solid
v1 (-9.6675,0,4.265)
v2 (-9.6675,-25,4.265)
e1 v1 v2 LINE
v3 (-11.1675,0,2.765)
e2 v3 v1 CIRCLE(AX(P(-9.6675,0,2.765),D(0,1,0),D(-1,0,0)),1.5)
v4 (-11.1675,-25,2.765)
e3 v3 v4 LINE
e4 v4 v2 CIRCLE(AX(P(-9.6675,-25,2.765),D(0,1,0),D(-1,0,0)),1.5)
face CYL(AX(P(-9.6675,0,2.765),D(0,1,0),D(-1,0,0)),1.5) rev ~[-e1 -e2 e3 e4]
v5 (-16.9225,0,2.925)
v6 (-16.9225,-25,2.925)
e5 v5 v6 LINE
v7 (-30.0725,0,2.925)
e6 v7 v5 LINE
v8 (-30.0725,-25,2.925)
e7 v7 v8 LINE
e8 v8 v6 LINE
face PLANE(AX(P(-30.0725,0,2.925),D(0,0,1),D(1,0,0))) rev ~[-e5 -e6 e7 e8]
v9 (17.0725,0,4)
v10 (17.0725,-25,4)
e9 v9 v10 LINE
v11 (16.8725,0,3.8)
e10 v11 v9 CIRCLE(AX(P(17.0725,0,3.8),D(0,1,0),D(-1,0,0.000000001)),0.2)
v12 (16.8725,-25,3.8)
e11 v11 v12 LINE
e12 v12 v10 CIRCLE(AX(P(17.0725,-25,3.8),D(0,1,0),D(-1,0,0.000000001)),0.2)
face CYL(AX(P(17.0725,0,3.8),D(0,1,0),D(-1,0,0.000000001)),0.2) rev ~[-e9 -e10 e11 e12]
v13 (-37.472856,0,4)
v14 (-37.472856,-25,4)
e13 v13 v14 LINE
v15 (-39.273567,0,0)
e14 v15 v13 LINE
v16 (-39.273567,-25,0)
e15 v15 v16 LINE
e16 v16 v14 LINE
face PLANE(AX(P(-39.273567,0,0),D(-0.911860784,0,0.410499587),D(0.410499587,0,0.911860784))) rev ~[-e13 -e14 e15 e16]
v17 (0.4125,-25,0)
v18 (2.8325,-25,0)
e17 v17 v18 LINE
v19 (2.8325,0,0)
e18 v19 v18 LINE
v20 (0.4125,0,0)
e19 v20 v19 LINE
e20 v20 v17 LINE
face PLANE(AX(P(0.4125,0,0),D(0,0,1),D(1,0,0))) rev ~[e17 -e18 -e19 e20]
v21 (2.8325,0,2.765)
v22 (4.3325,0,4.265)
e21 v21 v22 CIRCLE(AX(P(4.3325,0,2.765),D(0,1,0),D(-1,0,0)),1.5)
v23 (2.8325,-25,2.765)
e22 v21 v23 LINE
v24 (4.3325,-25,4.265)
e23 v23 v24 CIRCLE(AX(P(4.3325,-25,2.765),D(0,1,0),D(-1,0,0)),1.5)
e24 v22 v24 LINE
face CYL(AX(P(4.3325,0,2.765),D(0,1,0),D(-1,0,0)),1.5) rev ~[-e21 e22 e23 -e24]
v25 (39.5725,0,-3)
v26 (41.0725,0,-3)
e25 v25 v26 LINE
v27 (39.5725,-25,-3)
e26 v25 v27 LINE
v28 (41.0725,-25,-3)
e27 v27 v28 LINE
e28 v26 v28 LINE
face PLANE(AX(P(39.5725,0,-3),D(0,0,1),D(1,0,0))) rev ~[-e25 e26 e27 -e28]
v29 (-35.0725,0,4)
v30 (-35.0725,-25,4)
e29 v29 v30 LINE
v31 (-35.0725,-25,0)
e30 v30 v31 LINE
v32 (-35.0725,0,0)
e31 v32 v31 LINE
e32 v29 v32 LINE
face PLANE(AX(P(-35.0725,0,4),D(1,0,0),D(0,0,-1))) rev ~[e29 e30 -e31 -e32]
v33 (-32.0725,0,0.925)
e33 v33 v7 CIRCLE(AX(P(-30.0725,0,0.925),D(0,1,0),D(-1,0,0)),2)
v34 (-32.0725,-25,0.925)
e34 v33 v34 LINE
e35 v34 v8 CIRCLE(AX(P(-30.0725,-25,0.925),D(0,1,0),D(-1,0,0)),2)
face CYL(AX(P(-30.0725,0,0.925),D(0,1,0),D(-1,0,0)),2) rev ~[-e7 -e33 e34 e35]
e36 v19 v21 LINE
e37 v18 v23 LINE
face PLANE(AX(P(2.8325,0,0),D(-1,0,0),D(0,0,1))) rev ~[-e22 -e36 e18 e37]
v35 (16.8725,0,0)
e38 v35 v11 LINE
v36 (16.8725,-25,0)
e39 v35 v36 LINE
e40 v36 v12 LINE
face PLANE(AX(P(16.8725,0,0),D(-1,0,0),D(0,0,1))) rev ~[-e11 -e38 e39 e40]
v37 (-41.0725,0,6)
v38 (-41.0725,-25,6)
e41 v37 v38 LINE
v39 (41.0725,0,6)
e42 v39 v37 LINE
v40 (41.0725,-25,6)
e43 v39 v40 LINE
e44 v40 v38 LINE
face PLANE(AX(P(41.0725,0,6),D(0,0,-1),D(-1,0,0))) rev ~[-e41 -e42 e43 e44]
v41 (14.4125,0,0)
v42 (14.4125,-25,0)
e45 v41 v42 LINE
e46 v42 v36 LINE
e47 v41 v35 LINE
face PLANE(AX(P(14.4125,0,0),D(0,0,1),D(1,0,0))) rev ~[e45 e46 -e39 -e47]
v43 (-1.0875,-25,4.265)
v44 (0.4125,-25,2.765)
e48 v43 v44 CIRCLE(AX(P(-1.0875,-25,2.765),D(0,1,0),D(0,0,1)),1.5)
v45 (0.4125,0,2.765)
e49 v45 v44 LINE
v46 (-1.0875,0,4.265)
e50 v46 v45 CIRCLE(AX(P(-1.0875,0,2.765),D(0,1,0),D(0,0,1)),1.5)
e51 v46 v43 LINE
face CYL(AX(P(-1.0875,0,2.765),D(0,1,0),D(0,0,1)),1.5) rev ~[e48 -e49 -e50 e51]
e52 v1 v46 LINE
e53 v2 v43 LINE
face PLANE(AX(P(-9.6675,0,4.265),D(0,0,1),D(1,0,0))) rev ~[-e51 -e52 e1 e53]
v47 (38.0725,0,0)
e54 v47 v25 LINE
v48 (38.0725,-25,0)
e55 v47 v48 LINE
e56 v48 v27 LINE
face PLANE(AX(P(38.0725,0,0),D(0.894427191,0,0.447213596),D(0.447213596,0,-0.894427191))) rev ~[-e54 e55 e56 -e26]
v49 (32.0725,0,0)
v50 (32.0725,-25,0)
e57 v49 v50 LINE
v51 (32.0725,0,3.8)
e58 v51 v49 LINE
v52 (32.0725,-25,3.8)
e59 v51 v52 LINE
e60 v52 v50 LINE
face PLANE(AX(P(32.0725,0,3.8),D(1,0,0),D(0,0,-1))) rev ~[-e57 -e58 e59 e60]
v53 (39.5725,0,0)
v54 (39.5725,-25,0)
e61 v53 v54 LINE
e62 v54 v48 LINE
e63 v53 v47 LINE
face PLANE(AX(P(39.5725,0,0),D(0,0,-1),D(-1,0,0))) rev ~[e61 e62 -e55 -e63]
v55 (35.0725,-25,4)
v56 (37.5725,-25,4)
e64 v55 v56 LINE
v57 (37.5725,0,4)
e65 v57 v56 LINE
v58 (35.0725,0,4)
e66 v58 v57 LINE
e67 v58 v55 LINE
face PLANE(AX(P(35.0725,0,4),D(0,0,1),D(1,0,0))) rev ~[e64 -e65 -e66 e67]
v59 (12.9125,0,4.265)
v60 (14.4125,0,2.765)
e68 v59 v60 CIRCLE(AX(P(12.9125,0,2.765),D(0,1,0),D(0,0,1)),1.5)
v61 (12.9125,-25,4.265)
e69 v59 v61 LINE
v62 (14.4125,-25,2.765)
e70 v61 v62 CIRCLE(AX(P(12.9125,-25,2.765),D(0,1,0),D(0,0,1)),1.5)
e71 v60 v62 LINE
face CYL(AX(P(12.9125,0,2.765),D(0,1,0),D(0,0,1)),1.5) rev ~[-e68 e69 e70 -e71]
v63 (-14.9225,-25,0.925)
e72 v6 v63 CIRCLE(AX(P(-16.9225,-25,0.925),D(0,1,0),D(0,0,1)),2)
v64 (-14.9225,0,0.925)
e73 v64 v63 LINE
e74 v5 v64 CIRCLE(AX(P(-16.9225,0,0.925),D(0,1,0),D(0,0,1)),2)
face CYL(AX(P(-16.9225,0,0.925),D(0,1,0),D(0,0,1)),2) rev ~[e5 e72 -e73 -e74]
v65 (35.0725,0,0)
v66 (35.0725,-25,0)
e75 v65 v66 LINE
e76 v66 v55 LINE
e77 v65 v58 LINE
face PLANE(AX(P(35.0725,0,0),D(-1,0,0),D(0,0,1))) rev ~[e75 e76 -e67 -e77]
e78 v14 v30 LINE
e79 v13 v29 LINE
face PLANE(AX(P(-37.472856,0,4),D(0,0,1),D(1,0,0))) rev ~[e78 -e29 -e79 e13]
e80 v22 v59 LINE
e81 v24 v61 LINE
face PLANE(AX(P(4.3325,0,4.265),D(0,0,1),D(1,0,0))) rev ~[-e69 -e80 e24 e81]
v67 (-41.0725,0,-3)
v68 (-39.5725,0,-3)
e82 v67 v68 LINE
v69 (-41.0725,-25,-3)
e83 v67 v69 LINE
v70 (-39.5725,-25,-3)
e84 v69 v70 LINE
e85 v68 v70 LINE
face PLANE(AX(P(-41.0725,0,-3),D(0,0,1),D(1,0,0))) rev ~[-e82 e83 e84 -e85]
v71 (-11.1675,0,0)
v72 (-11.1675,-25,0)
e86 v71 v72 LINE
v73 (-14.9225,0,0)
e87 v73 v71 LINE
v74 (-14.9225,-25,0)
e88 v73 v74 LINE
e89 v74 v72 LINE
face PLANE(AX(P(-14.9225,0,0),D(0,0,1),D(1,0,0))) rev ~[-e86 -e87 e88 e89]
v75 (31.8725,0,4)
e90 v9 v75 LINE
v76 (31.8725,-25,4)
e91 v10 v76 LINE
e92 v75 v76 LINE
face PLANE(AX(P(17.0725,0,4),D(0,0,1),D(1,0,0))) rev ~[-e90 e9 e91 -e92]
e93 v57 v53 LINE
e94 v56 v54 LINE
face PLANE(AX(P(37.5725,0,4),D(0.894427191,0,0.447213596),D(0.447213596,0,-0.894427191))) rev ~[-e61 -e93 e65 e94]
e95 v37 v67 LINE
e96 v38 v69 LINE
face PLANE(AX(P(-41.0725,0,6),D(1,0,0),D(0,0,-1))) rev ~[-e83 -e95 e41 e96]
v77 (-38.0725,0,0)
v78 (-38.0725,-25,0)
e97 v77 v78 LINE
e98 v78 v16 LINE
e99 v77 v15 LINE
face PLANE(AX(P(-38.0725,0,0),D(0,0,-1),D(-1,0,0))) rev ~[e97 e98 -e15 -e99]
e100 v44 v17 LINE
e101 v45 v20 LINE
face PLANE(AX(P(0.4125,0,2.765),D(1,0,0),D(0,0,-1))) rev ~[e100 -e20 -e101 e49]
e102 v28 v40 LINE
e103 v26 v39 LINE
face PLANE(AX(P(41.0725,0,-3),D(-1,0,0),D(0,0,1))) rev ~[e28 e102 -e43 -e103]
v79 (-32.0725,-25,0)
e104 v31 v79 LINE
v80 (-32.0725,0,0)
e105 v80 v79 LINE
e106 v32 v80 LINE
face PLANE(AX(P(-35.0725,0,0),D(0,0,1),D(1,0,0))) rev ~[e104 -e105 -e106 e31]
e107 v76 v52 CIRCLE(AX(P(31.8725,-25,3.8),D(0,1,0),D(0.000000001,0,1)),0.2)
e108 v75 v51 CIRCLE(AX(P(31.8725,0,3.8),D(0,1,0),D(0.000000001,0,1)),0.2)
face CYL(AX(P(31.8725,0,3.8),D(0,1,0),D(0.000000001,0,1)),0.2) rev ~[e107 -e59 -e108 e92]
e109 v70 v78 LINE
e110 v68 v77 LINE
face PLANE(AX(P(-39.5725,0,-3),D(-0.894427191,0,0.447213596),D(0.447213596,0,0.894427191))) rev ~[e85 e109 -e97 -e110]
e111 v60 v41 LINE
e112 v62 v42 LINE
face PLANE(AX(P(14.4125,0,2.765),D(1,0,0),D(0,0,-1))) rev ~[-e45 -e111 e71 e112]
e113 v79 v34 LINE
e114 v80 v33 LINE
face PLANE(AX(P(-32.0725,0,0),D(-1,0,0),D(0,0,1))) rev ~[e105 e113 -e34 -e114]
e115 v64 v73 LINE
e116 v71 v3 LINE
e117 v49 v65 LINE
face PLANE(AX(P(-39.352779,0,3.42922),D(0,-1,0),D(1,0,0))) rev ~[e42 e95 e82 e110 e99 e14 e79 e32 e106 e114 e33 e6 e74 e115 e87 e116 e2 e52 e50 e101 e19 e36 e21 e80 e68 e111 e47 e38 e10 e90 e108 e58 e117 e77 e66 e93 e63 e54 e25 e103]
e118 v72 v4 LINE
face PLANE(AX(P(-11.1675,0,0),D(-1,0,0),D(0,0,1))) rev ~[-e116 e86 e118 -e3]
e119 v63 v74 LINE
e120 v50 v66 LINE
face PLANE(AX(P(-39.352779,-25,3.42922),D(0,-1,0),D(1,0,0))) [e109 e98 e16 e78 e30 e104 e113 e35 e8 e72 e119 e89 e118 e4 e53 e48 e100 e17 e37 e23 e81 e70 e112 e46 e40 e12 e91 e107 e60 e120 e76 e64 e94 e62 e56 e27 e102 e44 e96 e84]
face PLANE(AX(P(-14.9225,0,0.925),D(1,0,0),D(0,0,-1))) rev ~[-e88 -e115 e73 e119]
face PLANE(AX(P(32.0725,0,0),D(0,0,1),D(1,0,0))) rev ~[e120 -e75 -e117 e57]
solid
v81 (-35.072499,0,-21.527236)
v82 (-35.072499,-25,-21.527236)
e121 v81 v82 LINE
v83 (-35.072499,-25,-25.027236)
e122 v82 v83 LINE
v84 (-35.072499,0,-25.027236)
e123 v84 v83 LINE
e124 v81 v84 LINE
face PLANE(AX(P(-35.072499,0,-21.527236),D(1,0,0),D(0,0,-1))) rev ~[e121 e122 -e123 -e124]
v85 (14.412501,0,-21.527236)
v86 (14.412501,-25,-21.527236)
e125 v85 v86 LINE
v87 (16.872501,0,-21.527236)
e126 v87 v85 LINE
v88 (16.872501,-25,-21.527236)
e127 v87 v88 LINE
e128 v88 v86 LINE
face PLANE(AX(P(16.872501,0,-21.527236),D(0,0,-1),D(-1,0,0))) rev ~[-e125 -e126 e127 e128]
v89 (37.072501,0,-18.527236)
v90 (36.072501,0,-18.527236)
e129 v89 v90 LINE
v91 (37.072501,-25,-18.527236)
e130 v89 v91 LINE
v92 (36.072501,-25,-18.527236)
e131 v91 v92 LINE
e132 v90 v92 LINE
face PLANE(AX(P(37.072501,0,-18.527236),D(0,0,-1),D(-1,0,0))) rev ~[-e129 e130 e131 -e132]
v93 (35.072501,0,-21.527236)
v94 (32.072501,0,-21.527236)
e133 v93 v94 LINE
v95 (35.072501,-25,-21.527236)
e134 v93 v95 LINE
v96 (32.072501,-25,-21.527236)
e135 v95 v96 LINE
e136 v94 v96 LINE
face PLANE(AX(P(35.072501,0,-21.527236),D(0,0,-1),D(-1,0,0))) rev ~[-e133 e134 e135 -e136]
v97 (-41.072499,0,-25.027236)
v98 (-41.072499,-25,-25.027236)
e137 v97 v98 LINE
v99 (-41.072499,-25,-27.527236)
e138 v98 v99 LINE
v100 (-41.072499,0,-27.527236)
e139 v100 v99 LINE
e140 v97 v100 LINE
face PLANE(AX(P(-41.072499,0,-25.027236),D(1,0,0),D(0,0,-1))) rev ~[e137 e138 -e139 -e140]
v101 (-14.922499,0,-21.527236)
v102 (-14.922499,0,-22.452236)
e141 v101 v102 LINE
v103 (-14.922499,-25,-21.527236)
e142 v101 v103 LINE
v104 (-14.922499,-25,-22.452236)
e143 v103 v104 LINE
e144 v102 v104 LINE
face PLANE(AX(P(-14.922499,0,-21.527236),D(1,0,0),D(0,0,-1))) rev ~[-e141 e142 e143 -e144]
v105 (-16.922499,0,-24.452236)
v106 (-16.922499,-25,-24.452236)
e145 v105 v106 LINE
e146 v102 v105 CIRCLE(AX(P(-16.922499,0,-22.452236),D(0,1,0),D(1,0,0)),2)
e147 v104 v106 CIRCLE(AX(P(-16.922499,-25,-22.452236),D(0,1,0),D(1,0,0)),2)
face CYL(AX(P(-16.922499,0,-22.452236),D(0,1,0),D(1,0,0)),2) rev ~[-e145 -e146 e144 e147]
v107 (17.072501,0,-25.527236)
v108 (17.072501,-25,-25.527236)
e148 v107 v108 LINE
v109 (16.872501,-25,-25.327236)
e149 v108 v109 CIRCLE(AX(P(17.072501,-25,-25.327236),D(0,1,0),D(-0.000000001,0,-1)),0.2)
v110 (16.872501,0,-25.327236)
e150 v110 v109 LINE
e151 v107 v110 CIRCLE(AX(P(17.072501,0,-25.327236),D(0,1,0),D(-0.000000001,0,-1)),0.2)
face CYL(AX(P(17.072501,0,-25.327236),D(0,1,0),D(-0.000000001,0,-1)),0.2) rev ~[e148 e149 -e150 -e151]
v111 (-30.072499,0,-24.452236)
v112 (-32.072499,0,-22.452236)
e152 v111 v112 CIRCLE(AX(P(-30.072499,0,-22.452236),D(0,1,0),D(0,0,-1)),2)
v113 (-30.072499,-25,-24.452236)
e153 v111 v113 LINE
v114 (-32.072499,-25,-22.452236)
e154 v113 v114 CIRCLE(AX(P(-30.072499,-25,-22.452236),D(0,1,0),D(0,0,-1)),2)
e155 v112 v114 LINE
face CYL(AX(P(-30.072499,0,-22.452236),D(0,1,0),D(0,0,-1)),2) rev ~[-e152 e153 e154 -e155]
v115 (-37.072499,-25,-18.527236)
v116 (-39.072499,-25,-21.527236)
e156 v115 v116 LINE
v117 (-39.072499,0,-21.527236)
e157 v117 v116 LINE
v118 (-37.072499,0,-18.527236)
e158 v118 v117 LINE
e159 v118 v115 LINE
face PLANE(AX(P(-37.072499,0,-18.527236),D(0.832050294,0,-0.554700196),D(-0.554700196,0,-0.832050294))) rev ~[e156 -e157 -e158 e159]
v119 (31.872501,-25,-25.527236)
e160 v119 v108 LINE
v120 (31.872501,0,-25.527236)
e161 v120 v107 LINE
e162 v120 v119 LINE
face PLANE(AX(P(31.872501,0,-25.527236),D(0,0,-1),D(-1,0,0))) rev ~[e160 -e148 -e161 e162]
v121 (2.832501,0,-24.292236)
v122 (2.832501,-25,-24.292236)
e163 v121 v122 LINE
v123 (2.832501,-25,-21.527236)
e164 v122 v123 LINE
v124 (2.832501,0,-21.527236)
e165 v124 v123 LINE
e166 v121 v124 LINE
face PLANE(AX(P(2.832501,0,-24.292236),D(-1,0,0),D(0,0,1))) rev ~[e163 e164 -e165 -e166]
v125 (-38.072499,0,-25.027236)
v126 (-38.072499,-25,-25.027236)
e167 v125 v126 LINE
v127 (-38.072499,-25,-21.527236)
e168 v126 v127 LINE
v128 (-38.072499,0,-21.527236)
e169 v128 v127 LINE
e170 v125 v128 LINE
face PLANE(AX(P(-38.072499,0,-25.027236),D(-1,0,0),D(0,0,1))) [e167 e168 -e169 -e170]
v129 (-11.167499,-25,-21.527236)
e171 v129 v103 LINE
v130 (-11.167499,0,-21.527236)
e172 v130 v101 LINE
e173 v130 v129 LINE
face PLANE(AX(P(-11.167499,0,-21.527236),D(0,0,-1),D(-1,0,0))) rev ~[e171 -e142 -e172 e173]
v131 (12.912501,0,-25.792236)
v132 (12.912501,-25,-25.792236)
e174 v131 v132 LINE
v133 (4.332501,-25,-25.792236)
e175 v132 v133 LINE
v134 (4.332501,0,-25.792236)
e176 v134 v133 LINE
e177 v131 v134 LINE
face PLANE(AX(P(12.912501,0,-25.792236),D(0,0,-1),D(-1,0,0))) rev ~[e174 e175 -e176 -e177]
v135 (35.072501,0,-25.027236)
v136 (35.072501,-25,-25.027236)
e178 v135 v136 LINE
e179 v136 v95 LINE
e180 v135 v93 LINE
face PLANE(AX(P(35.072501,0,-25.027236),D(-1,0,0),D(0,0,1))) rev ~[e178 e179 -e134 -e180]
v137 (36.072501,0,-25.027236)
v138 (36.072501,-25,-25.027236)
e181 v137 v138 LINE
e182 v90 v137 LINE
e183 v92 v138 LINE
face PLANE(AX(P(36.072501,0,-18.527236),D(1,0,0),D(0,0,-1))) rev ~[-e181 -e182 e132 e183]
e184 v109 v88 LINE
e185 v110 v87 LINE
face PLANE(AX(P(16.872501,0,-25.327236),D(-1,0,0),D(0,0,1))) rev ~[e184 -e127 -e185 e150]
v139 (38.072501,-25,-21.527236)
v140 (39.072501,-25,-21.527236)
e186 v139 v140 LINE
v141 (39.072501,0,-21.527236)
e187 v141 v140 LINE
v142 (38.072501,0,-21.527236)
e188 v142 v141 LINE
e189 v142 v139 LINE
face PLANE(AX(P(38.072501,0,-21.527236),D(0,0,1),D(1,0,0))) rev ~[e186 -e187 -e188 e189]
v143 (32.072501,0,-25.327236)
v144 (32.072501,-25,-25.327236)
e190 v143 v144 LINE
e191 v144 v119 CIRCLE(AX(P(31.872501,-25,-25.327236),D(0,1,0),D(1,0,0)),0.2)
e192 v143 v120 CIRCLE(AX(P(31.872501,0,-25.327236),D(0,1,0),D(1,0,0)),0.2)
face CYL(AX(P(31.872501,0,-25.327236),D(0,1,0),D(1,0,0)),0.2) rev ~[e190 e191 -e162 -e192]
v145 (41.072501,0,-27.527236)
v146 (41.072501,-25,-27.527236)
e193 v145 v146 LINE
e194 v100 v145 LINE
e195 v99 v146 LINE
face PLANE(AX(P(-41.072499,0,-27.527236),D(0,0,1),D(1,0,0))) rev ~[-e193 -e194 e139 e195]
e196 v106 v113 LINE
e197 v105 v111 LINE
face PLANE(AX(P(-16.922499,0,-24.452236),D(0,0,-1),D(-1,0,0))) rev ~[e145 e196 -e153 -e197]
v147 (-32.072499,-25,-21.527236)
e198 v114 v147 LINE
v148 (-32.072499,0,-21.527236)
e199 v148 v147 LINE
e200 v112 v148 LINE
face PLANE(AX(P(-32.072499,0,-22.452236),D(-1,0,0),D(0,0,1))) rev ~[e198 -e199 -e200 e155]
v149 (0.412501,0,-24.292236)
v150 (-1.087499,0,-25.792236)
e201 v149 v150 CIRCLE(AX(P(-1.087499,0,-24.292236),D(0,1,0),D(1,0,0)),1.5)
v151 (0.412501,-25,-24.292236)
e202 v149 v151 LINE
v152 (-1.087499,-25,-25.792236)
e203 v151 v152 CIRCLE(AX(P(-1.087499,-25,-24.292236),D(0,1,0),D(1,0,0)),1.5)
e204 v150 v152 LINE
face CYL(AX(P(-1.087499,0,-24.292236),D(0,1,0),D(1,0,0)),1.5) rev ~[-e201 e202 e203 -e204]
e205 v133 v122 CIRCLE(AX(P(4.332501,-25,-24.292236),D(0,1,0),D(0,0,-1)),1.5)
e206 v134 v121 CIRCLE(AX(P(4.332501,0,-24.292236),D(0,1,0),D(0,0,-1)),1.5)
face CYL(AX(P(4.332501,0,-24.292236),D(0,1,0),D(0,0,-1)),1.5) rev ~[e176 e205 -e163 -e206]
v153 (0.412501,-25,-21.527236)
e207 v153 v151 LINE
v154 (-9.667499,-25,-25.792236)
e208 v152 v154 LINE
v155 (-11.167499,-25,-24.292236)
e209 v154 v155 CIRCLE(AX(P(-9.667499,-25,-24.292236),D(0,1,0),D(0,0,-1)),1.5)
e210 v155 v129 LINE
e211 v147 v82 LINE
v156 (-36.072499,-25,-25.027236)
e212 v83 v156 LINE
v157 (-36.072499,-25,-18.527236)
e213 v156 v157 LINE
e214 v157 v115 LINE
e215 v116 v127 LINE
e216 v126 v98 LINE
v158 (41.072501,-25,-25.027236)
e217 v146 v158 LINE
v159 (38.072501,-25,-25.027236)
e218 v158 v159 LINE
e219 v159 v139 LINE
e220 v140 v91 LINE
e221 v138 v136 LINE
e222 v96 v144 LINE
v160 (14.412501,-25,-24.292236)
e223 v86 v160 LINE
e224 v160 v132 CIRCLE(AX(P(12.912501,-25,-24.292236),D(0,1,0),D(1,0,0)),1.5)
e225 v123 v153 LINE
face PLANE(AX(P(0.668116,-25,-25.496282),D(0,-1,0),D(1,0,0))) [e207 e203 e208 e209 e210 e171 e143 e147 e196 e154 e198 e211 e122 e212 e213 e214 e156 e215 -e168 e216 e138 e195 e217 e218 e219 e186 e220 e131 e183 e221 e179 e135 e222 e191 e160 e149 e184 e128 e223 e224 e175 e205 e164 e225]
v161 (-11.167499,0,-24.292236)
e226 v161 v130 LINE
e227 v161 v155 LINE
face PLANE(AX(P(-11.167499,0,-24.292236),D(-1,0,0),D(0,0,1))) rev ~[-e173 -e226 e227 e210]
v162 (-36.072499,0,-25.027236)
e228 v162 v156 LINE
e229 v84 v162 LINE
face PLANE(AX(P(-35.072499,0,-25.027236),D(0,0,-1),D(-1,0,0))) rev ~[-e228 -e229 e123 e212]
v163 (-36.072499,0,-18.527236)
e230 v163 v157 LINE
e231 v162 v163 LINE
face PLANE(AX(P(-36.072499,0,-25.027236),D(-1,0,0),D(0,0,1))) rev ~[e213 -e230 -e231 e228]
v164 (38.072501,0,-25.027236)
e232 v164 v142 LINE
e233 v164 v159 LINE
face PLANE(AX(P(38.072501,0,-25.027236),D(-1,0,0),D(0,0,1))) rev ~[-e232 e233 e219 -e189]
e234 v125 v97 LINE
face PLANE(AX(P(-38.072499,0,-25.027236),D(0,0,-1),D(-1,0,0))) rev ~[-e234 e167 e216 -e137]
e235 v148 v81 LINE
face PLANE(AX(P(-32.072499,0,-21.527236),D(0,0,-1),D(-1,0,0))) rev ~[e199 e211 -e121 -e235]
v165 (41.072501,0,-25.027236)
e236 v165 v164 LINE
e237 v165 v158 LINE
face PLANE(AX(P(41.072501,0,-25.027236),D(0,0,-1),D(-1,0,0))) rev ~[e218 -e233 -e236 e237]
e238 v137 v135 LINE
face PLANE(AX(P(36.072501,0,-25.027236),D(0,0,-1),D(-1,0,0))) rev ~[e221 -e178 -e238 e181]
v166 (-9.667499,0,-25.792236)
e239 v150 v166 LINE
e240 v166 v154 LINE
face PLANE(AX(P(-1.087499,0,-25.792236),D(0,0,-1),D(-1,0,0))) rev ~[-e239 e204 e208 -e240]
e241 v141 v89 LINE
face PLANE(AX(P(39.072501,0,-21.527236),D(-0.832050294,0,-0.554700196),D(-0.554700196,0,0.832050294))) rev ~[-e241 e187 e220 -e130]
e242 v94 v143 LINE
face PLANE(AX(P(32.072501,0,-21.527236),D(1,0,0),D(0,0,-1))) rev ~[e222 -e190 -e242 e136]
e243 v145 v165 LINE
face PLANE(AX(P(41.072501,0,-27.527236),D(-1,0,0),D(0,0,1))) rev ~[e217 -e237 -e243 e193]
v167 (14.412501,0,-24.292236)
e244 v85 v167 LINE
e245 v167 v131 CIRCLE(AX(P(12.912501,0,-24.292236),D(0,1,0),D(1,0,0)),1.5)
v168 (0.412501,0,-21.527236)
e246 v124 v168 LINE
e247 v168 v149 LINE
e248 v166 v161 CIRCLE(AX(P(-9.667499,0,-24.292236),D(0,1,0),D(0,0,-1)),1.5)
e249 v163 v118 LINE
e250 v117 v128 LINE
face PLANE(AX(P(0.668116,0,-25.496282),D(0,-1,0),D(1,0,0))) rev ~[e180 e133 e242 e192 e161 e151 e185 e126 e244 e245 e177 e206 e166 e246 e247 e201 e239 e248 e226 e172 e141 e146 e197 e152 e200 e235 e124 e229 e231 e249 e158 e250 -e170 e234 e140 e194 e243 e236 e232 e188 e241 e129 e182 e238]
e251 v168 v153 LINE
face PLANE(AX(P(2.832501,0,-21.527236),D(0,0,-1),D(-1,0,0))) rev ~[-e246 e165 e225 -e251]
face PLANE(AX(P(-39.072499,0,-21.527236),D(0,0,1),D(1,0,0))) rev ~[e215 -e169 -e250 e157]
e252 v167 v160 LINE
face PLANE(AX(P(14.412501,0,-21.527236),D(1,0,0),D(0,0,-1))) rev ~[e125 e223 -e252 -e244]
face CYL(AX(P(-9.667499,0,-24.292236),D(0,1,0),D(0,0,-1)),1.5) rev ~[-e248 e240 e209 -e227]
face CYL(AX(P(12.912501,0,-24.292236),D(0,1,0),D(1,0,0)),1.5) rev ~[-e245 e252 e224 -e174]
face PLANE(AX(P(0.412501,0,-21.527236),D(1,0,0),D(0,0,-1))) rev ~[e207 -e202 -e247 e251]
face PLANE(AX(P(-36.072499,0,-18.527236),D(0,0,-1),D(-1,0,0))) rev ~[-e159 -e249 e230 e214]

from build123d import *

# Parameters (mm, degrees)
F1_DEPTH = 25
F0_W     = 2
F0_H     = 2.5
F0_H_2   = 3.5
F2_DEPTH = 25


with BuildPart() as f1:
    # F0 (on Front) → F1 (new body)
    with BuildSketch(Plane.XZ):
        Polygon((-41.0725, 6), (-41.0725, 0), (-39.2735674977, 0), (-37.4728558326, 4), (-36.5725, 6), align=None)
        Polygon((-37.4728558326, 4), (-35.0725, 4), (-35.0725, 4.5), (-35.0725, 6), (-36.5725, 6), align=None)
        with BuildLine():
            Line((32.0725, 0), (35.0725, 0))
            Line((35.0725, 0), (35.0725, 4))
            Line((35.0725, 4), (35.0725, 4.5))
            Line((35.0725, 4.5), (35.0725, 6))
            Line((35.0725, 6), (33.5725, 6))
            Line((33.5725, 6), (-33.5725, 6))
            Line((-33.5725, 6), (-35.0725, 6))
            Line((-35.0725, 6), (-35.0725, 4.5))
            Line((-35.0725, 4.5), (-35.0725, 4))
            Line((-35.0725, 4), (-35.0725, 0))
            Line((-35.0725, 0), (-32.0725, 0))
            Line((-32.0725, 0), (-32.0725, 0.925))
            ThreePointArc((-32.0725, 0.925), (-31.4867135624, 2.3392135624), (-30.0725, 2.925))
            Line((-30.0725, 2.925), (-16.9225, 2.925))
            ThreePointArc((-16.9225, 2.925), (-15.5082864376, 2.3392135624), (-14.9225, 0.925))
            Line((-14.9225, 0.925), (-14.9225, 0))
            Line((-14.9225, 0), (-11.1675, 0))
            Line((-11.1675, 0), (-11.1675, 2.765))
            ThreePointArc((-11.1675, 2.765), (-10.7281601718, 3.8256601718), (-9.6675, 4.265))
            Line((-9.6675, 4.265), (-1.0875, 4.265))
            ThreePointArc((-1.0875, 4.265), (-0.0268398282, 3.8256601718), (0.4125, 2.765))
            Line((0.4125, 2.765), (0.4125, 0))
            Line((0.4125, 0), (2.8325, 0))
            Line((2.8325, 0), (2.8325, 2.765))
            ThreePointArc((2.8325, 2.765), (3.2718398282, 3.8256601718), (4.3325, 4.265))
            Line((4.3325, 4.265), (12.9125, 4.265))
            ThreePointArc((12.9125, 4.265), (13.9731601718, 3.8256601718), (14.4125, 2.765))
            Line((14.4125, 2.765), (14.4125, 0))
            Line((14.4125, 0), (16.8725, 0))
            Line((16.8725, 0), (16.8725, 3.8))
            ThreePointArc((16.8725, 3.8), (16.9310786438, 3.9414213562), (17.0725, 4))
            Line((17.0725, 4), (31.8725, 4))
            ThreePointArc((31.8725, 4), (32.0139213562, 3.9414213562), (32.0725, 3.8))
            Line((32.0725, 3.8), (32.0725, 0))
        make_face()
        Polygon((35.0725, 4.5), (35.0725, 4), (37.5725, 4), (36.5725, 6), (35.0725, 6), align=None)
        Polygon((39.5725, 0), (41.0725, 0), (41.0725, 6), (36.5725, 6), (37.5725, 4), align=None)
        Polygon((39.5725, -3), (41.0725, -3), (41.0725, 0), (39.5725, 0), (38.0725, 0), align=None)
        Polygon((-41.0725, 0), (-41.0725, -3), (-39.5725, -3), (-38.0725, 0), (-39.2735674977, 0), align=None)
    extrude(amount=F1_DEPTH)


with BuildPart() as f2:
    # F0 (on Front) → F2 (new body)
    with BuildSketch(Plane.XZ):
        with BuildLine():
            Line((-33.572499007, -27.5272362262), (33.572500993, -27.5272362262))
            Line((33.572500993, -27.5272362262), (35.072500993, -27.5272362262))
            Line((35.072500993, -27.5272362262), (35.072500993, -26.0272362262))
            Line((35.072500993, -26.0272362262), (35.072500993, -25.0272362262))
            Line((35.072500993, -25.0272362262), (35.072500993, -21.5272362262))
            Line((35.072500993, -21.5272362262), (32.072500993, -21.5272362262))
            Line((32.072500993, -21.5272362262), (32.072500993, -25.3272362262))
            ThreePointArc((32.072500993, -25.3272362262), (32.0139223493, -25.4686575824), (31.872500993, -25.5272362262))
            Line((31.872500993, -25.5272362262), (17.072500993, -25.5272362262))
            ThreePointArc((17.072500993, -25.5272362262), (16.9310796368, -25.4686575824), (16.872500993, -25.3272362262))
            Line((16.872500993, -25.3272362262), (16.872500993, -21.5272362262))
            Line((16.872500993, -21.5272362262), (14.412500993, -21.5272362262))
            Line((14.412500993, -21.5272362262), (14.412500993, -24.2922362262))
            ThreePointArc((14.412500993, -24.2922362262), (13.9731611648, -25.352896398), (12.912500993, -25.7922362262))
            Line((12.912500993, -25.7922362262), (4.332500993, -25.7922362262))
            ThreePointArc((4.332500993, -25.7922362262), (3.2718408212, -25.352896398), (2.832500993, -24.2922362262))
            Line((2.832500993, -24.2922362262), (2.832500993, -21.5272362262))
            Line((2.832500993, -21.5272362262), (0.412500993, -21.5272362262))
            Line((0.412500993, -21.5272362262), (0.412500993, -24.2922362262))
            ThreePointArc((0.412500993, -24.2922362262), (-0.0268388352, -25.352896398), (-1.087499007, -25.7922362262))
            Line((-1.087499007, -25.7922362262), (-9.667499007, -25.7922362262))
            ThreePointArc((-9.667499007, -25.7922362262), (-10.7281591788, -25.352896398), (-11.167499007, -24.2922362262))
            Line((-11.167499007, -24.2922362262), (-11.167499007, -21.5272362262))
            Line((-11.167499007, -21.5272362262), (-14.922499007, -21.5272362262))
            Line((-14.922499007, -21.5272362262), (-14.922499007, -22.4522362262))
            ThreePointArc((-14.922499007, -22.4522362262), (-15.5082854446, -23.8664497886), (-16.922499007, -24.4522362262))
            Line((-16.922499007, -24.4522362262), (-30.072499007, -24.4522362262))
            ThreePointArc((-30.072499007, -24.4522362262), (-31.4867125694, -23.8664497886), (-32.072499007, -22.4522362262))
            Line((-32.072499007, -22.4522362262), (-32.072499007, -21.5272362262))
            Line((-32.072499007, -21.5272362262), (-35.072499007, -21.5272362262))
            Line((-35.072499007, -21.5272362262), (-35.072499007, -25.0272362262))
            Line((-35.072499007, -25.0272362262), (-35.072499007, -26.0272362262))
            Line((-35.072499007, -26.0272362262), (-35.072499007, -27.5272362262))
            Line((-35.072499007, -27.5272362262), (-33.572499007, -27.5272362262))
        make_face()
        Polygon((35.072500993, -26.0272362262), (35.072500993, -27.5272362262), (36.072500993, -27.5272362262), (36.072500993, -25.0272362262), (35.072500993, -25.0272362262), align=None)
        Polygon((-36.072499007, -27.5272362262), (-35.072499007, -27.5272362262), (-35.072499007, -26.0272362262), (-35.072499007, -25.0272362262), (-36.072499007, -25.0272362262), align=None)
        with Locations((37.072500993, -26.2772362262)):
            Rectangle(F0_W, F0_H)
        with Locations((-37.072499007, -26.2772362262)):
            Rectangle(F0_W, F0_H)
        Polygon((38.072500993, -25.0272362262), (38.072500993, -27.5272362262), (41.072500993, -27.5272362262), (39.822500993, -25.0272362262), align=None)
        with Locations((37.072500993, -23.2772362262)):
            Rectangle(F0_W, F0_H_2)
        Polygon((-41.072499007, -27.5272362262), (-38.072499007, -27.5272362262), (-38.072499007, -25.0272362262), (-39.822499007, -25.0272362262), align=None)
        with Locations((-37.072499007, -23.2772362262)):
            Rectangle(F0_W, F0_H_2)
        Polygon((39.822500993, -25.0272362262), (41.072500993, -27.5272362262), (41.072500993, -25.0272362262), align=None)
        Polygon((36.072500993, -18.5272362262), (36.072500993, -21.5272362262), (38.072500993, -21.5272362262), (39.072500993, -21.5272362262), (37.072500993, -18.5272362262), align=None)
        Polygon((-41.072499007, -25.0272362262), (-41.072499007, -27.5272362262), (-39.822499007, -25.0272362262), align=None)
        Polygon((-38.072499007, -21.5272362262), (-36.072499007, -21.5272362262), (-36.072499007, -18.5272362262), (-37.072499007, -18.5272362262), (-39.072499007, -21.5272362262), align=None)
    extrude(amount=F2_DEPTH)


solid = Compound([f1.part, f2.part])
